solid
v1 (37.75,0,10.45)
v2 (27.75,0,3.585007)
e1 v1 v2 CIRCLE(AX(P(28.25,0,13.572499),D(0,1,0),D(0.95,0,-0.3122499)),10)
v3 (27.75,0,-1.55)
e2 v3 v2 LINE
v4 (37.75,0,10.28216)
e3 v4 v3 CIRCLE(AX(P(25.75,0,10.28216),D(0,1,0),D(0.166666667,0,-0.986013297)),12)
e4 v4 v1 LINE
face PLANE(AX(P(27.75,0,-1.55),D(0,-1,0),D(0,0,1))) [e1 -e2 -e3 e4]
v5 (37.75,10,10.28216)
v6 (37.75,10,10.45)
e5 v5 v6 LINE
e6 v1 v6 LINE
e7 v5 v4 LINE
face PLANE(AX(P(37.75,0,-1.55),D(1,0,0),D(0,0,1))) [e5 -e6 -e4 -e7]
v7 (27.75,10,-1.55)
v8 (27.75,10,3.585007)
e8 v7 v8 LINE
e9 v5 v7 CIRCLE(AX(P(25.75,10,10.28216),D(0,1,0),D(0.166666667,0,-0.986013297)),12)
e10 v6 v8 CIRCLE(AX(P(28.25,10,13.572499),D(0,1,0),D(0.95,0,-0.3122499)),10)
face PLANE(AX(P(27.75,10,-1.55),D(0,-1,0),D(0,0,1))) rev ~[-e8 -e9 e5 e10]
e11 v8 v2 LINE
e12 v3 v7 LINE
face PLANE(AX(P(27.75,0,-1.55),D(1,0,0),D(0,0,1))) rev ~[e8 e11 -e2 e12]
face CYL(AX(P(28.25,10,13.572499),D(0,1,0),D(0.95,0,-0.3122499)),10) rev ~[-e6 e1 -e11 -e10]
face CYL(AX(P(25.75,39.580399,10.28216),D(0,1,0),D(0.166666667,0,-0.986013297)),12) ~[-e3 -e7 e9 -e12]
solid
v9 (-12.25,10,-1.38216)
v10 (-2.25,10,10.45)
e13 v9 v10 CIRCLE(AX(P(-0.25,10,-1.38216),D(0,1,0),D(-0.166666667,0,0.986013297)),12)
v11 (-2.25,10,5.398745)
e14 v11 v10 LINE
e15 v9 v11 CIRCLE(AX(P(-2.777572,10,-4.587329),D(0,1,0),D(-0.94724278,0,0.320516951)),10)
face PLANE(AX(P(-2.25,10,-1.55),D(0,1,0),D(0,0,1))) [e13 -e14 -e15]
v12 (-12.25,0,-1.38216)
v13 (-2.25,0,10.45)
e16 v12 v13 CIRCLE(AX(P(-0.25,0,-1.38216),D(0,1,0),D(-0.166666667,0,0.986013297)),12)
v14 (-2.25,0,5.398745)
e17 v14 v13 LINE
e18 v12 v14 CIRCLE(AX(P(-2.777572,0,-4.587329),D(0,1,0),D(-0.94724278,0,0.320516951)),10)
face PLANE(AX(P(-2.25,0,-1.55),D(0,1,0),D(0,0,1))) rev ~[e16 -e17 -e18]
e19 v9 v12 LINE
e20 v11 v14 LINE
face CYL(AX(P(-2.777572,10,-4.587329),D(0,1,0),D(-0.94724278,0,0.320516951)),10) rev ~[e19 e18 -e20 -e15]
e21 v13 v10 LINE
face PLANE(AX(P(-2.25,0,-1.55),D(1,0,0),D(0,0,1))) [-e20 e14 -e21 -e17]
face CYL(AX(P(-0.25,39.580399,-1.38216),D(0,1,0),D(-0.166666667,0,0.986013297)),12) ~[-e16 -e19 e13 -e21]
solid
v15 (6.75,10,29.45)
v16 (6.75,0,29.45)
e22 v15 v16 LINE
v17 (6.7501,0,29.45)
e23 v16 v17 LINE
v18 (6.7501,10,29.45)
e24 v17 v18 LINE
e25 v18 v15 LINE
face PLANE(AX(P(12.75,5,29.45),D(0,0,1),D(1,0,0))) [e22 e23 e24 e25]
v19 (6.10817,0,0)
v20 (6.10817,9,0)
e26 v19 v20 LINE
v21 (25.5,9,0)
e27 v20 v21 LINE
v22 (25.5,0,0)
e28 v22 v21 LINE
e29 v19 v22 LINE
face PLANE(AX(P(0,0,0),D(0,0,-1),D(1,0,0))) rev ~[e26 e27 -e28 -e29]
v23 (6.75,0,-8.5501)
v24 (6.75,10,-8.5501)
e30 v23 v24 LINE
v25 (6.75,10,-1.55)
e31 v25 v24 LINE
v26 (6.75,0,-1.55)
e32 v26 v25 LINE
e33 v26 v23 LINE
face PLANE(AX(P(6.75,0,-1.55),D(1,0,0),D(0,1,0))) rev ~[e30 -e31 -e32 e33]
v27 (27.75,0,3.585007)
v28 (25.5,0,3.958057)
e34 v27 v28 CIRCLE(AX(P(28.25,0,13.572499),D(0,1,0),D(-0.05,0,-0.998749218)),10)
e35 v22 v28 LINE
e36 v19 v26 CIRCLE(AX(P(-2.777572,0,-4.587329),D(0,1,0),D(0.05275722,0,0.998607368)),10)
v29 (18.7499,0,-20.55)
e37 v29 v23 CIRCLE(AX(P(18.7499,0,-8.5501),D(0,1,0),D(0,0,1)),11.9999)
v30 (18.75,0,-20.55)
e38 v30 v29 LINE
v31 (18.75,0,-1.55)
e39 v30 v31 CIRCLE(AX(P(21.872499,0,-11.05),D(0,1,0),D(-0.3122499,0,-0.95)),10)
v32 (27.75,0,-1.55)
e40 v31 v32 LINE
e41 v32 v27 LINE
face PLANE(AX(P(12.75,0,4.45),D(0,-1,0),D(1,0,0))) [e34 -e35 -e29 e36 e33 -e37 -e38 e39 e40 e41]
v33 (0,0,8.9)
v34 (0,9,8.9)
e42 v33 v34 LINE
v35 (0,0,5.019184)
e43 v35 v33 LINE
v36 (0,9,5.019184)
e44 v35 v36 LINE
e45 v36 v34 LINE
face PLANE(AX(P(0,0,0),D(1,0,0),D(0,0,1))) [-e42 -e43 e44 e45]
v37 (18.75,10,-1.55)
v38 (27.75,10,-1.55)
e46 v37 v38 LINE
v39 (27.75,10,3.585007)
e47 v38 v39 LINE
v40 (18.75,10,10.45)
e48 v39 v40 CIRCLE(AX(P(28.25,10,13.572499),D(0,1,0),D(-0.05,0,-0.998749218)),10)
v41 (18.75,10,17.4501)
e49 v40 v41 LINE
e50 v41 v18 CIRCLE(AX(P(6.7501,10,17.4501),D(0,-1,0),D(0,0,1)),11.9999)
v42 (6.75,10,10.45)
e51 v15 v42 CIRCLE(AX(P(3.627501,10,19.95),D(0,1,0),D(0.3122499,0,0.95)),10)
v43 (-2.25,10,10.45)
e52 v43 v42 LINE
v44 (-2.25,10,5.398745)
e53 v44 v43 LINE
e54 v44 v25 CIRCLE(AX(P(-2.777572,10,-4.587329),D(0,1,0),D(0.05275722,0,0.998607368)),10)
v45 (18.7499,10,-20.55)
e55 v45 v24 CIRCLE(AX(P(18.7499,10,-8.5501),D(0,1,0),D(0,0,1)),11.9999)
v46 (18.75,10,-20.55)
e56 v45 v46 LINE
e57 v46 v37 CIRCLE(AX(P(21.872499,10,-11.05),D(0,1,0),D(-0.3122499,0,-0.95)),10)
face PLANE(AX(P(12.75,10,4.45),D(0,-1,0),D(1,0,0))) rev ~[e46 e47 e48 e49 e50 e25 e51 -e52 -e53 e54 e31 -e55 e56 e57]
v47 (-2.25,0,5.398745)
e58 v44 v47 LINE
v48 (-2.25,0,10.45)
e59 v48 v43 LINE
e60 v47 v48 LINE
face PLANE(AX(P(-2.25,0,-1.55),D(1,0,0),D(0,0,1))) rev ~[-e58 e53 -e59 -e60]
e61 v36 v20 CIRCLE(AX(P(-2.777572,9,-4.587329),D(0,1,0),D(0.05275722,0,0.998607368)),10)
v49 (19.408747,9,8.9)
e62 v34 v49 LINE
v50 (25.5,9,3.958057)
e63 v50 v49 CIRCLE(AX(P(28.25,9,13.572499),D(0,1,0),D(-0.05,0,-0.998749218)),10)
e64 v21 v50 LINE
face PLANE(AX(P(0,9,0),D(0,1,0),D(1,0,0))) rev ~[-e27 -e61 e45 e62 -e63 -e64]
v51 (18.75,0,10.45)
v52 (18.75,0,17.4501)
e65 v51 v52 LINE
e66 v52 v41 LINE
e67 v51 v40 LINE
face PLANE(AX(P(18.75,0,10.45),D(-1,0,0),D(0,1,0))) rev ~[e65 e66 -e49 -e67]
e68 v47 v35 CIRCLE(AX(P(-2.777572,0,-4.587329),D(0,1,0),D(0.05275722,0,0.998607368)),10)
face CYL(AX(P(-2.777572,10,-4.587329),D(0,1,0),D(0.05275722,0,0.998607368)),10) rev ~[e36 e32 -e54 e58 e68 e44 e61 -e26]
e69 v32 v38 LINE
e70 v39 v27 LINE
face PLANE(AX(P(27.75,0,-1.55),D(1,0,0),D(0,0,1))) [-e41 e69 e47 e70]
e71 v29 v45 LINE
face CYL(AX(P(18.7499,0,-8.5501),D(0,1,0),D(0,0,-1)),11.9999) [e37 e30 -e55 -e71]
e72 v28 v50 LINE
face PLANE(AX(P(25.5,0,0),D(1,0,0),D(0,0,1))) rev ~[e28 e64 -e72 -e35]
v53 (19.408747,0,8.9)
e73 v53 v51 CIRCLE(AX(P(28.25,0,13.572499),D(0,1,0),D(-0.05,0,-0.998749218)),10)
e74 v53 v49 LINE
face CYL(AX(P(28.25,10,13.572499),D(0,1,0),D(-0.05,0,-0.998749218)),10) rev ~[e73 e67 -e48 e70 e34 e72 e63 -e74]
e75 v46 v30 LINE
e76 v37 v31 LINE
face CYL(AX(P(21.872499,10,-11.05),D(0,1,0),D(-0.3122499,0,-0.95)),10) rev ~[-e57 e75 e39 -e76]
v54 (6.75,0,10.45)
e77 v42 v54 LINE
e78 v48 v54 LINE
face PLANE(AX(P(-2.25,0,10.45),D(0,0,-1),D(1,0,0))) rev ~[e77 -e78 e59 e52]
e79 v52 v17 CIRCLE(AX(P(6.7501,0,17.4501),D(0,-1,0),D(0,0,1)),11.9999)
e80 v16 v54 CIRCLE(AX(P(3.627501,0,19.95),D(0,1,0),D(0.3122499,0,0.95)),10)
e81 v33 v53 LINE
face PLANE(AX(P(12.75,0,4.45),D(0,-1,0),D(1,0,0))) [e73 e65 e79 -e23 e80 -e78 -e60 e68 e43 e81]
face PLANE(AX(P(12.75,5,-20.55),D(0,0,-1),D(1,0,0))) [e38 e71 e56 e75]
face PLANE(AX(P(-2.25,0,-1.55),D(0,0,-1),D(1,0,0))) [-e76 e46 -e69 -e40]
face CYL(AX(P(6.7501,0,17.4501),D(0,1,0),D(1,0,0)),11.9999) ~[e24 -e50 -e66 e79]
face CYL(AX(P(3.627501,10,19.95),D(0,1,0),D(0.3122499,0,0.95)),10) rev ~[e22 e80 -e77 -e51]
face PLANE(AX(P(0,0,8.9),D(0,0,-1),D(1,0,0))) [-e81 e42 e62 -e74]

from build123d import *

# Parameters (mm, degrees)
F0_W           = 25.5
F0_H           = 8.9
F1_DEPTH       = 8.9
F2_W           = 30
F2_H           = 12
F2_W_2         = 25.5
F2_H_2         = 8.9
F3_DEPTH       = 10
F4_DEPTH       = 9
F5_DEPTH       = 10
F6_DEPTH       = 10
F8_DEPTH       = 19
F10_DEPTH      = 19
F11_F1_R       = 11.9999
F11_F2_R       = 11.9999
F11_2_T1_DEPTH = 69.160797831
F11_3_T1_DEPTH = 69.160797831
F13_DEPTH      = 10


# Not quite as in the source:
# - a fillet or chamfer that OpenCascade refuses, or shapes differently, is made with other operations: its cross-section is extruded or revolved along the edge and cut away or added
# - a fillet or chamfer is up to 0.001 mm smaller than in the source, because OpenCascade refuses the exact size


with BuildPart() as f1:
    # F0 (on Top) → F1 (new body)
    with BuildSketch(Plane.XY):
        with Locations((12.75, 4.45)):
            Rectangle(F0_W, F0_H)
    extrude(amount=F1_DEPTH)


with BuildPart() as f3:
    # F2 (on face) → F3 (new body)
    with BuildSketch(Plane.XZ):
        with Locations((12.75, 4.45)):
            Rectangle(F2_W, F2_H)
        with Locations((12.75, 4.45)):
            Rectangle(F2_W_2, F2_H_2, mode=Mode.SUBTRACT)
        with Locations((12.75, 4.45)):
            Rectangle(F2_W_2, F2_H_2)
    extrude(amount=-F3_DEPTH)


with BuildPart() as f4_tool:
    # F4 (cut): a face of the model
    f4_faces = [f1.part.faces().sort_by_distance(p)[0] for p in [
        (12.75, 0, 4.45),
    ]]
    extrude(f4_faces, amount=-F4_DEPTH)


with BuildPart() as f1_1:
    add(f1.part)

    # F4: cut by f4_tool
    add(f4_tool.part, mode=Mode.SUBTRACT)


with BuildPart() as f3_1:
    add(f3.part)

    # F4: cut by f4_tool
    add(f4_tool.part, mode=Mode.SUBTRACT)


with BuildPart() as f5:
    # F5 (new): a face of the model
    f5_faces = [f3_1.part.faces().sort_by_distance(p)[0] for p in [
        (-2.25, 5, 4.45),
    ]]
    extrude(f5_faces, amount=F5_DEPTH)

    # F11#2: fillet of radius 12 on 1 edges, made by hand

    # F11_2_s2 → F11_2_t1 (cut)
    with BuildSketch(Plane.XZ.offset(-39.5803989155)):
        with BuildLine():
            ThreePointArc((-2.25, 10.45), (-9.4151513899, 6.3638071262), (-12.25, -1.3821595662))
            Line((-12.25, -1.3821595662), (-12.25, 10.45))
            Line((-12.25, 10.45), (-2.25, 10.45))
        make_face()
    extrude(amount=F11_2_T1_DEPTH, mode=Mode.SUBTRACT)


with BuildPart() as f6:
    # F6 (new): a face of the model
    f6_faces = [f3_1.part.faces().sort_by_distance(p)[0] for p in [
        (27.75, 5, 4.45),
    ]]
    extrude(f6_faces, amount=F6_DEPTH)

    # F11#3: fillet of radius 12 on 1 edges, made by hand

    # F11_3_s2 → F11_3_t1 (cut)
    with BuildSketch(Plane.XZ.offset(-39.5803989155)):
        with BuildLine():
            ThreePointArc((27.75, -1.55), (34.9151513899, 2.5361928738), (37.75, 10.2821595662))
            Line((37.75, 10.2821595662), (37.75, -1.55))
            Line((37.75, -1.55), (27.75, -1.55))
        make_face()
    extrude(amount=F11_3_T1_DEPTH, mode=Mode.SUBTRACT)


with BuildPart() as f3_2:
    add(f3_1.part)

    # F7 (on face) → F8 (join)
    with BuildSketch(Plane.XY.offset(10.45)):
        Polygon((6.75, 0), (12.75, 0), (18.75, 0), (18.75, 10), (12.75, 10), (6.75, 10), align=None)
    extrude(amount=F8_DEPTH)

    # F9 (on face) → F10 (join)
    with BuildSketch(Plane(origin=(0, 0, -1.55), x_dir=(1, 0, 0), z_dir=(0, 0, -1))):
        Polygon((6.75, -10), (12.75, -10), (18.75, -10), (18.75, 0), (12.75, 0), (6.75, 0), align=None)
    extrude(amount=F10_DEPTH)

    # F11: fillet of radius 12 on 2 edges, made by hand

    # F11_f1 (radius 12 in the source; OpenCascade refuses exactly that, so slightly less here)
    f11_f1_edges = [f3_2.edges().sort_by_distance(p)[0] for p in [
        (18.75, 5, 29.45),
    ]]
    fillet(f11_f1_edges, radius=F11_F1_R)

    # F11_f2 (radius 12 in the source; OpenCascade refuses exactly that, so slightly less here)
    f11_f2_edges = [f3_2.edges().sort_by_distance(p)[0] for p in [
        (6.75, 5, -20.55),
    ]]
    fillet(f11_f2_edges, radius=F11_F2_R)


with BuildPart() as f13_tool:
    # F12 (on face) → F13 (new body)
    with BuildSketch(Plane(origin=(0, 10, 0), x_dir=(-1, 0, 0), z_dir=(0, 1, 0))):
        with BuildLine():
            Line((-27.75, 3.5850068215), (-27.75, 10.45))
            Line((-27.75, 10.45), (-37.75, 10.45))
            ThreePointArc((-37.75, 10.45), (-33.9096848707, 5.3282302527), (-27.75, 3.5850068215))
        make_face()
        with BuildLine():
            ThreePointArc((-27.75, 3.5850068215), (-22.1851807253, 5.6215262811), (-18.75, 10.45))
            Line((-18.75, 10.45), (-27.75, 10.45))
            Line((-27.75, 10.45), (-27.75, 3.5850068215))
        make_face()
        with BuildLine():
            ThreePointArc((-6.75, 29.45), (-13.6275010008, 19.95), (-6.75, 10.45))
            Line((-6.75, 10.45), (-6.75, 29.45))
        make_face()
        with BuildLine():
            Line((2.25, 5.3987446019), (2.25, -1.55))
            Line((2.25, -1.55), (12.25, -1.55))
            Line((12.25, -1.55), (12.25, -1.3821595662))
            ThreePointArc((12.25, -1.3821595662), (8.389860126, 3.6892779702), (2.25, 5.3987446019))
        make_face()
        with BuildLine():
            ThreePointArc((2.25, 5.3987446019), (-3.3337079529, 3.3279886569), (-6.75, -1.55))
            Line((-6.75, -1.55), (2.25, -1.55))
            Line((2.25, -1.55), (2.25, 5.3987446019))
        make_face()
        with BuildLine():
            ThreePointArc((-18.75, -20.55), (-11.8724989992, -11.05), (-18.75, -1.55))
            Line((-18.75, -1.55), (-18.75, -20.55))
        make_face()
    extrude(amount=-F13_DEPTH)


with BuildPart() as f3_3:
    add(f3_2.part)

    # F13: cut by f13_tool
    add(f13_tool.part, mode=Mode.SUBTRACT)


with BuildPart() as f5_1:
    add(f5.part)

    # F13: cut by f13_tool
    add(f13_tool.part, mode=Mode.SUBTRACT)


with BuildPart() as f6_1:
    add(f6.part)

    # F13: cut by f13_tool
    add(f13_tool.part, mode=Mode.SUBTRACT)


solid = Compound([f3_3.part, f5_1.part, f6_1.part])
